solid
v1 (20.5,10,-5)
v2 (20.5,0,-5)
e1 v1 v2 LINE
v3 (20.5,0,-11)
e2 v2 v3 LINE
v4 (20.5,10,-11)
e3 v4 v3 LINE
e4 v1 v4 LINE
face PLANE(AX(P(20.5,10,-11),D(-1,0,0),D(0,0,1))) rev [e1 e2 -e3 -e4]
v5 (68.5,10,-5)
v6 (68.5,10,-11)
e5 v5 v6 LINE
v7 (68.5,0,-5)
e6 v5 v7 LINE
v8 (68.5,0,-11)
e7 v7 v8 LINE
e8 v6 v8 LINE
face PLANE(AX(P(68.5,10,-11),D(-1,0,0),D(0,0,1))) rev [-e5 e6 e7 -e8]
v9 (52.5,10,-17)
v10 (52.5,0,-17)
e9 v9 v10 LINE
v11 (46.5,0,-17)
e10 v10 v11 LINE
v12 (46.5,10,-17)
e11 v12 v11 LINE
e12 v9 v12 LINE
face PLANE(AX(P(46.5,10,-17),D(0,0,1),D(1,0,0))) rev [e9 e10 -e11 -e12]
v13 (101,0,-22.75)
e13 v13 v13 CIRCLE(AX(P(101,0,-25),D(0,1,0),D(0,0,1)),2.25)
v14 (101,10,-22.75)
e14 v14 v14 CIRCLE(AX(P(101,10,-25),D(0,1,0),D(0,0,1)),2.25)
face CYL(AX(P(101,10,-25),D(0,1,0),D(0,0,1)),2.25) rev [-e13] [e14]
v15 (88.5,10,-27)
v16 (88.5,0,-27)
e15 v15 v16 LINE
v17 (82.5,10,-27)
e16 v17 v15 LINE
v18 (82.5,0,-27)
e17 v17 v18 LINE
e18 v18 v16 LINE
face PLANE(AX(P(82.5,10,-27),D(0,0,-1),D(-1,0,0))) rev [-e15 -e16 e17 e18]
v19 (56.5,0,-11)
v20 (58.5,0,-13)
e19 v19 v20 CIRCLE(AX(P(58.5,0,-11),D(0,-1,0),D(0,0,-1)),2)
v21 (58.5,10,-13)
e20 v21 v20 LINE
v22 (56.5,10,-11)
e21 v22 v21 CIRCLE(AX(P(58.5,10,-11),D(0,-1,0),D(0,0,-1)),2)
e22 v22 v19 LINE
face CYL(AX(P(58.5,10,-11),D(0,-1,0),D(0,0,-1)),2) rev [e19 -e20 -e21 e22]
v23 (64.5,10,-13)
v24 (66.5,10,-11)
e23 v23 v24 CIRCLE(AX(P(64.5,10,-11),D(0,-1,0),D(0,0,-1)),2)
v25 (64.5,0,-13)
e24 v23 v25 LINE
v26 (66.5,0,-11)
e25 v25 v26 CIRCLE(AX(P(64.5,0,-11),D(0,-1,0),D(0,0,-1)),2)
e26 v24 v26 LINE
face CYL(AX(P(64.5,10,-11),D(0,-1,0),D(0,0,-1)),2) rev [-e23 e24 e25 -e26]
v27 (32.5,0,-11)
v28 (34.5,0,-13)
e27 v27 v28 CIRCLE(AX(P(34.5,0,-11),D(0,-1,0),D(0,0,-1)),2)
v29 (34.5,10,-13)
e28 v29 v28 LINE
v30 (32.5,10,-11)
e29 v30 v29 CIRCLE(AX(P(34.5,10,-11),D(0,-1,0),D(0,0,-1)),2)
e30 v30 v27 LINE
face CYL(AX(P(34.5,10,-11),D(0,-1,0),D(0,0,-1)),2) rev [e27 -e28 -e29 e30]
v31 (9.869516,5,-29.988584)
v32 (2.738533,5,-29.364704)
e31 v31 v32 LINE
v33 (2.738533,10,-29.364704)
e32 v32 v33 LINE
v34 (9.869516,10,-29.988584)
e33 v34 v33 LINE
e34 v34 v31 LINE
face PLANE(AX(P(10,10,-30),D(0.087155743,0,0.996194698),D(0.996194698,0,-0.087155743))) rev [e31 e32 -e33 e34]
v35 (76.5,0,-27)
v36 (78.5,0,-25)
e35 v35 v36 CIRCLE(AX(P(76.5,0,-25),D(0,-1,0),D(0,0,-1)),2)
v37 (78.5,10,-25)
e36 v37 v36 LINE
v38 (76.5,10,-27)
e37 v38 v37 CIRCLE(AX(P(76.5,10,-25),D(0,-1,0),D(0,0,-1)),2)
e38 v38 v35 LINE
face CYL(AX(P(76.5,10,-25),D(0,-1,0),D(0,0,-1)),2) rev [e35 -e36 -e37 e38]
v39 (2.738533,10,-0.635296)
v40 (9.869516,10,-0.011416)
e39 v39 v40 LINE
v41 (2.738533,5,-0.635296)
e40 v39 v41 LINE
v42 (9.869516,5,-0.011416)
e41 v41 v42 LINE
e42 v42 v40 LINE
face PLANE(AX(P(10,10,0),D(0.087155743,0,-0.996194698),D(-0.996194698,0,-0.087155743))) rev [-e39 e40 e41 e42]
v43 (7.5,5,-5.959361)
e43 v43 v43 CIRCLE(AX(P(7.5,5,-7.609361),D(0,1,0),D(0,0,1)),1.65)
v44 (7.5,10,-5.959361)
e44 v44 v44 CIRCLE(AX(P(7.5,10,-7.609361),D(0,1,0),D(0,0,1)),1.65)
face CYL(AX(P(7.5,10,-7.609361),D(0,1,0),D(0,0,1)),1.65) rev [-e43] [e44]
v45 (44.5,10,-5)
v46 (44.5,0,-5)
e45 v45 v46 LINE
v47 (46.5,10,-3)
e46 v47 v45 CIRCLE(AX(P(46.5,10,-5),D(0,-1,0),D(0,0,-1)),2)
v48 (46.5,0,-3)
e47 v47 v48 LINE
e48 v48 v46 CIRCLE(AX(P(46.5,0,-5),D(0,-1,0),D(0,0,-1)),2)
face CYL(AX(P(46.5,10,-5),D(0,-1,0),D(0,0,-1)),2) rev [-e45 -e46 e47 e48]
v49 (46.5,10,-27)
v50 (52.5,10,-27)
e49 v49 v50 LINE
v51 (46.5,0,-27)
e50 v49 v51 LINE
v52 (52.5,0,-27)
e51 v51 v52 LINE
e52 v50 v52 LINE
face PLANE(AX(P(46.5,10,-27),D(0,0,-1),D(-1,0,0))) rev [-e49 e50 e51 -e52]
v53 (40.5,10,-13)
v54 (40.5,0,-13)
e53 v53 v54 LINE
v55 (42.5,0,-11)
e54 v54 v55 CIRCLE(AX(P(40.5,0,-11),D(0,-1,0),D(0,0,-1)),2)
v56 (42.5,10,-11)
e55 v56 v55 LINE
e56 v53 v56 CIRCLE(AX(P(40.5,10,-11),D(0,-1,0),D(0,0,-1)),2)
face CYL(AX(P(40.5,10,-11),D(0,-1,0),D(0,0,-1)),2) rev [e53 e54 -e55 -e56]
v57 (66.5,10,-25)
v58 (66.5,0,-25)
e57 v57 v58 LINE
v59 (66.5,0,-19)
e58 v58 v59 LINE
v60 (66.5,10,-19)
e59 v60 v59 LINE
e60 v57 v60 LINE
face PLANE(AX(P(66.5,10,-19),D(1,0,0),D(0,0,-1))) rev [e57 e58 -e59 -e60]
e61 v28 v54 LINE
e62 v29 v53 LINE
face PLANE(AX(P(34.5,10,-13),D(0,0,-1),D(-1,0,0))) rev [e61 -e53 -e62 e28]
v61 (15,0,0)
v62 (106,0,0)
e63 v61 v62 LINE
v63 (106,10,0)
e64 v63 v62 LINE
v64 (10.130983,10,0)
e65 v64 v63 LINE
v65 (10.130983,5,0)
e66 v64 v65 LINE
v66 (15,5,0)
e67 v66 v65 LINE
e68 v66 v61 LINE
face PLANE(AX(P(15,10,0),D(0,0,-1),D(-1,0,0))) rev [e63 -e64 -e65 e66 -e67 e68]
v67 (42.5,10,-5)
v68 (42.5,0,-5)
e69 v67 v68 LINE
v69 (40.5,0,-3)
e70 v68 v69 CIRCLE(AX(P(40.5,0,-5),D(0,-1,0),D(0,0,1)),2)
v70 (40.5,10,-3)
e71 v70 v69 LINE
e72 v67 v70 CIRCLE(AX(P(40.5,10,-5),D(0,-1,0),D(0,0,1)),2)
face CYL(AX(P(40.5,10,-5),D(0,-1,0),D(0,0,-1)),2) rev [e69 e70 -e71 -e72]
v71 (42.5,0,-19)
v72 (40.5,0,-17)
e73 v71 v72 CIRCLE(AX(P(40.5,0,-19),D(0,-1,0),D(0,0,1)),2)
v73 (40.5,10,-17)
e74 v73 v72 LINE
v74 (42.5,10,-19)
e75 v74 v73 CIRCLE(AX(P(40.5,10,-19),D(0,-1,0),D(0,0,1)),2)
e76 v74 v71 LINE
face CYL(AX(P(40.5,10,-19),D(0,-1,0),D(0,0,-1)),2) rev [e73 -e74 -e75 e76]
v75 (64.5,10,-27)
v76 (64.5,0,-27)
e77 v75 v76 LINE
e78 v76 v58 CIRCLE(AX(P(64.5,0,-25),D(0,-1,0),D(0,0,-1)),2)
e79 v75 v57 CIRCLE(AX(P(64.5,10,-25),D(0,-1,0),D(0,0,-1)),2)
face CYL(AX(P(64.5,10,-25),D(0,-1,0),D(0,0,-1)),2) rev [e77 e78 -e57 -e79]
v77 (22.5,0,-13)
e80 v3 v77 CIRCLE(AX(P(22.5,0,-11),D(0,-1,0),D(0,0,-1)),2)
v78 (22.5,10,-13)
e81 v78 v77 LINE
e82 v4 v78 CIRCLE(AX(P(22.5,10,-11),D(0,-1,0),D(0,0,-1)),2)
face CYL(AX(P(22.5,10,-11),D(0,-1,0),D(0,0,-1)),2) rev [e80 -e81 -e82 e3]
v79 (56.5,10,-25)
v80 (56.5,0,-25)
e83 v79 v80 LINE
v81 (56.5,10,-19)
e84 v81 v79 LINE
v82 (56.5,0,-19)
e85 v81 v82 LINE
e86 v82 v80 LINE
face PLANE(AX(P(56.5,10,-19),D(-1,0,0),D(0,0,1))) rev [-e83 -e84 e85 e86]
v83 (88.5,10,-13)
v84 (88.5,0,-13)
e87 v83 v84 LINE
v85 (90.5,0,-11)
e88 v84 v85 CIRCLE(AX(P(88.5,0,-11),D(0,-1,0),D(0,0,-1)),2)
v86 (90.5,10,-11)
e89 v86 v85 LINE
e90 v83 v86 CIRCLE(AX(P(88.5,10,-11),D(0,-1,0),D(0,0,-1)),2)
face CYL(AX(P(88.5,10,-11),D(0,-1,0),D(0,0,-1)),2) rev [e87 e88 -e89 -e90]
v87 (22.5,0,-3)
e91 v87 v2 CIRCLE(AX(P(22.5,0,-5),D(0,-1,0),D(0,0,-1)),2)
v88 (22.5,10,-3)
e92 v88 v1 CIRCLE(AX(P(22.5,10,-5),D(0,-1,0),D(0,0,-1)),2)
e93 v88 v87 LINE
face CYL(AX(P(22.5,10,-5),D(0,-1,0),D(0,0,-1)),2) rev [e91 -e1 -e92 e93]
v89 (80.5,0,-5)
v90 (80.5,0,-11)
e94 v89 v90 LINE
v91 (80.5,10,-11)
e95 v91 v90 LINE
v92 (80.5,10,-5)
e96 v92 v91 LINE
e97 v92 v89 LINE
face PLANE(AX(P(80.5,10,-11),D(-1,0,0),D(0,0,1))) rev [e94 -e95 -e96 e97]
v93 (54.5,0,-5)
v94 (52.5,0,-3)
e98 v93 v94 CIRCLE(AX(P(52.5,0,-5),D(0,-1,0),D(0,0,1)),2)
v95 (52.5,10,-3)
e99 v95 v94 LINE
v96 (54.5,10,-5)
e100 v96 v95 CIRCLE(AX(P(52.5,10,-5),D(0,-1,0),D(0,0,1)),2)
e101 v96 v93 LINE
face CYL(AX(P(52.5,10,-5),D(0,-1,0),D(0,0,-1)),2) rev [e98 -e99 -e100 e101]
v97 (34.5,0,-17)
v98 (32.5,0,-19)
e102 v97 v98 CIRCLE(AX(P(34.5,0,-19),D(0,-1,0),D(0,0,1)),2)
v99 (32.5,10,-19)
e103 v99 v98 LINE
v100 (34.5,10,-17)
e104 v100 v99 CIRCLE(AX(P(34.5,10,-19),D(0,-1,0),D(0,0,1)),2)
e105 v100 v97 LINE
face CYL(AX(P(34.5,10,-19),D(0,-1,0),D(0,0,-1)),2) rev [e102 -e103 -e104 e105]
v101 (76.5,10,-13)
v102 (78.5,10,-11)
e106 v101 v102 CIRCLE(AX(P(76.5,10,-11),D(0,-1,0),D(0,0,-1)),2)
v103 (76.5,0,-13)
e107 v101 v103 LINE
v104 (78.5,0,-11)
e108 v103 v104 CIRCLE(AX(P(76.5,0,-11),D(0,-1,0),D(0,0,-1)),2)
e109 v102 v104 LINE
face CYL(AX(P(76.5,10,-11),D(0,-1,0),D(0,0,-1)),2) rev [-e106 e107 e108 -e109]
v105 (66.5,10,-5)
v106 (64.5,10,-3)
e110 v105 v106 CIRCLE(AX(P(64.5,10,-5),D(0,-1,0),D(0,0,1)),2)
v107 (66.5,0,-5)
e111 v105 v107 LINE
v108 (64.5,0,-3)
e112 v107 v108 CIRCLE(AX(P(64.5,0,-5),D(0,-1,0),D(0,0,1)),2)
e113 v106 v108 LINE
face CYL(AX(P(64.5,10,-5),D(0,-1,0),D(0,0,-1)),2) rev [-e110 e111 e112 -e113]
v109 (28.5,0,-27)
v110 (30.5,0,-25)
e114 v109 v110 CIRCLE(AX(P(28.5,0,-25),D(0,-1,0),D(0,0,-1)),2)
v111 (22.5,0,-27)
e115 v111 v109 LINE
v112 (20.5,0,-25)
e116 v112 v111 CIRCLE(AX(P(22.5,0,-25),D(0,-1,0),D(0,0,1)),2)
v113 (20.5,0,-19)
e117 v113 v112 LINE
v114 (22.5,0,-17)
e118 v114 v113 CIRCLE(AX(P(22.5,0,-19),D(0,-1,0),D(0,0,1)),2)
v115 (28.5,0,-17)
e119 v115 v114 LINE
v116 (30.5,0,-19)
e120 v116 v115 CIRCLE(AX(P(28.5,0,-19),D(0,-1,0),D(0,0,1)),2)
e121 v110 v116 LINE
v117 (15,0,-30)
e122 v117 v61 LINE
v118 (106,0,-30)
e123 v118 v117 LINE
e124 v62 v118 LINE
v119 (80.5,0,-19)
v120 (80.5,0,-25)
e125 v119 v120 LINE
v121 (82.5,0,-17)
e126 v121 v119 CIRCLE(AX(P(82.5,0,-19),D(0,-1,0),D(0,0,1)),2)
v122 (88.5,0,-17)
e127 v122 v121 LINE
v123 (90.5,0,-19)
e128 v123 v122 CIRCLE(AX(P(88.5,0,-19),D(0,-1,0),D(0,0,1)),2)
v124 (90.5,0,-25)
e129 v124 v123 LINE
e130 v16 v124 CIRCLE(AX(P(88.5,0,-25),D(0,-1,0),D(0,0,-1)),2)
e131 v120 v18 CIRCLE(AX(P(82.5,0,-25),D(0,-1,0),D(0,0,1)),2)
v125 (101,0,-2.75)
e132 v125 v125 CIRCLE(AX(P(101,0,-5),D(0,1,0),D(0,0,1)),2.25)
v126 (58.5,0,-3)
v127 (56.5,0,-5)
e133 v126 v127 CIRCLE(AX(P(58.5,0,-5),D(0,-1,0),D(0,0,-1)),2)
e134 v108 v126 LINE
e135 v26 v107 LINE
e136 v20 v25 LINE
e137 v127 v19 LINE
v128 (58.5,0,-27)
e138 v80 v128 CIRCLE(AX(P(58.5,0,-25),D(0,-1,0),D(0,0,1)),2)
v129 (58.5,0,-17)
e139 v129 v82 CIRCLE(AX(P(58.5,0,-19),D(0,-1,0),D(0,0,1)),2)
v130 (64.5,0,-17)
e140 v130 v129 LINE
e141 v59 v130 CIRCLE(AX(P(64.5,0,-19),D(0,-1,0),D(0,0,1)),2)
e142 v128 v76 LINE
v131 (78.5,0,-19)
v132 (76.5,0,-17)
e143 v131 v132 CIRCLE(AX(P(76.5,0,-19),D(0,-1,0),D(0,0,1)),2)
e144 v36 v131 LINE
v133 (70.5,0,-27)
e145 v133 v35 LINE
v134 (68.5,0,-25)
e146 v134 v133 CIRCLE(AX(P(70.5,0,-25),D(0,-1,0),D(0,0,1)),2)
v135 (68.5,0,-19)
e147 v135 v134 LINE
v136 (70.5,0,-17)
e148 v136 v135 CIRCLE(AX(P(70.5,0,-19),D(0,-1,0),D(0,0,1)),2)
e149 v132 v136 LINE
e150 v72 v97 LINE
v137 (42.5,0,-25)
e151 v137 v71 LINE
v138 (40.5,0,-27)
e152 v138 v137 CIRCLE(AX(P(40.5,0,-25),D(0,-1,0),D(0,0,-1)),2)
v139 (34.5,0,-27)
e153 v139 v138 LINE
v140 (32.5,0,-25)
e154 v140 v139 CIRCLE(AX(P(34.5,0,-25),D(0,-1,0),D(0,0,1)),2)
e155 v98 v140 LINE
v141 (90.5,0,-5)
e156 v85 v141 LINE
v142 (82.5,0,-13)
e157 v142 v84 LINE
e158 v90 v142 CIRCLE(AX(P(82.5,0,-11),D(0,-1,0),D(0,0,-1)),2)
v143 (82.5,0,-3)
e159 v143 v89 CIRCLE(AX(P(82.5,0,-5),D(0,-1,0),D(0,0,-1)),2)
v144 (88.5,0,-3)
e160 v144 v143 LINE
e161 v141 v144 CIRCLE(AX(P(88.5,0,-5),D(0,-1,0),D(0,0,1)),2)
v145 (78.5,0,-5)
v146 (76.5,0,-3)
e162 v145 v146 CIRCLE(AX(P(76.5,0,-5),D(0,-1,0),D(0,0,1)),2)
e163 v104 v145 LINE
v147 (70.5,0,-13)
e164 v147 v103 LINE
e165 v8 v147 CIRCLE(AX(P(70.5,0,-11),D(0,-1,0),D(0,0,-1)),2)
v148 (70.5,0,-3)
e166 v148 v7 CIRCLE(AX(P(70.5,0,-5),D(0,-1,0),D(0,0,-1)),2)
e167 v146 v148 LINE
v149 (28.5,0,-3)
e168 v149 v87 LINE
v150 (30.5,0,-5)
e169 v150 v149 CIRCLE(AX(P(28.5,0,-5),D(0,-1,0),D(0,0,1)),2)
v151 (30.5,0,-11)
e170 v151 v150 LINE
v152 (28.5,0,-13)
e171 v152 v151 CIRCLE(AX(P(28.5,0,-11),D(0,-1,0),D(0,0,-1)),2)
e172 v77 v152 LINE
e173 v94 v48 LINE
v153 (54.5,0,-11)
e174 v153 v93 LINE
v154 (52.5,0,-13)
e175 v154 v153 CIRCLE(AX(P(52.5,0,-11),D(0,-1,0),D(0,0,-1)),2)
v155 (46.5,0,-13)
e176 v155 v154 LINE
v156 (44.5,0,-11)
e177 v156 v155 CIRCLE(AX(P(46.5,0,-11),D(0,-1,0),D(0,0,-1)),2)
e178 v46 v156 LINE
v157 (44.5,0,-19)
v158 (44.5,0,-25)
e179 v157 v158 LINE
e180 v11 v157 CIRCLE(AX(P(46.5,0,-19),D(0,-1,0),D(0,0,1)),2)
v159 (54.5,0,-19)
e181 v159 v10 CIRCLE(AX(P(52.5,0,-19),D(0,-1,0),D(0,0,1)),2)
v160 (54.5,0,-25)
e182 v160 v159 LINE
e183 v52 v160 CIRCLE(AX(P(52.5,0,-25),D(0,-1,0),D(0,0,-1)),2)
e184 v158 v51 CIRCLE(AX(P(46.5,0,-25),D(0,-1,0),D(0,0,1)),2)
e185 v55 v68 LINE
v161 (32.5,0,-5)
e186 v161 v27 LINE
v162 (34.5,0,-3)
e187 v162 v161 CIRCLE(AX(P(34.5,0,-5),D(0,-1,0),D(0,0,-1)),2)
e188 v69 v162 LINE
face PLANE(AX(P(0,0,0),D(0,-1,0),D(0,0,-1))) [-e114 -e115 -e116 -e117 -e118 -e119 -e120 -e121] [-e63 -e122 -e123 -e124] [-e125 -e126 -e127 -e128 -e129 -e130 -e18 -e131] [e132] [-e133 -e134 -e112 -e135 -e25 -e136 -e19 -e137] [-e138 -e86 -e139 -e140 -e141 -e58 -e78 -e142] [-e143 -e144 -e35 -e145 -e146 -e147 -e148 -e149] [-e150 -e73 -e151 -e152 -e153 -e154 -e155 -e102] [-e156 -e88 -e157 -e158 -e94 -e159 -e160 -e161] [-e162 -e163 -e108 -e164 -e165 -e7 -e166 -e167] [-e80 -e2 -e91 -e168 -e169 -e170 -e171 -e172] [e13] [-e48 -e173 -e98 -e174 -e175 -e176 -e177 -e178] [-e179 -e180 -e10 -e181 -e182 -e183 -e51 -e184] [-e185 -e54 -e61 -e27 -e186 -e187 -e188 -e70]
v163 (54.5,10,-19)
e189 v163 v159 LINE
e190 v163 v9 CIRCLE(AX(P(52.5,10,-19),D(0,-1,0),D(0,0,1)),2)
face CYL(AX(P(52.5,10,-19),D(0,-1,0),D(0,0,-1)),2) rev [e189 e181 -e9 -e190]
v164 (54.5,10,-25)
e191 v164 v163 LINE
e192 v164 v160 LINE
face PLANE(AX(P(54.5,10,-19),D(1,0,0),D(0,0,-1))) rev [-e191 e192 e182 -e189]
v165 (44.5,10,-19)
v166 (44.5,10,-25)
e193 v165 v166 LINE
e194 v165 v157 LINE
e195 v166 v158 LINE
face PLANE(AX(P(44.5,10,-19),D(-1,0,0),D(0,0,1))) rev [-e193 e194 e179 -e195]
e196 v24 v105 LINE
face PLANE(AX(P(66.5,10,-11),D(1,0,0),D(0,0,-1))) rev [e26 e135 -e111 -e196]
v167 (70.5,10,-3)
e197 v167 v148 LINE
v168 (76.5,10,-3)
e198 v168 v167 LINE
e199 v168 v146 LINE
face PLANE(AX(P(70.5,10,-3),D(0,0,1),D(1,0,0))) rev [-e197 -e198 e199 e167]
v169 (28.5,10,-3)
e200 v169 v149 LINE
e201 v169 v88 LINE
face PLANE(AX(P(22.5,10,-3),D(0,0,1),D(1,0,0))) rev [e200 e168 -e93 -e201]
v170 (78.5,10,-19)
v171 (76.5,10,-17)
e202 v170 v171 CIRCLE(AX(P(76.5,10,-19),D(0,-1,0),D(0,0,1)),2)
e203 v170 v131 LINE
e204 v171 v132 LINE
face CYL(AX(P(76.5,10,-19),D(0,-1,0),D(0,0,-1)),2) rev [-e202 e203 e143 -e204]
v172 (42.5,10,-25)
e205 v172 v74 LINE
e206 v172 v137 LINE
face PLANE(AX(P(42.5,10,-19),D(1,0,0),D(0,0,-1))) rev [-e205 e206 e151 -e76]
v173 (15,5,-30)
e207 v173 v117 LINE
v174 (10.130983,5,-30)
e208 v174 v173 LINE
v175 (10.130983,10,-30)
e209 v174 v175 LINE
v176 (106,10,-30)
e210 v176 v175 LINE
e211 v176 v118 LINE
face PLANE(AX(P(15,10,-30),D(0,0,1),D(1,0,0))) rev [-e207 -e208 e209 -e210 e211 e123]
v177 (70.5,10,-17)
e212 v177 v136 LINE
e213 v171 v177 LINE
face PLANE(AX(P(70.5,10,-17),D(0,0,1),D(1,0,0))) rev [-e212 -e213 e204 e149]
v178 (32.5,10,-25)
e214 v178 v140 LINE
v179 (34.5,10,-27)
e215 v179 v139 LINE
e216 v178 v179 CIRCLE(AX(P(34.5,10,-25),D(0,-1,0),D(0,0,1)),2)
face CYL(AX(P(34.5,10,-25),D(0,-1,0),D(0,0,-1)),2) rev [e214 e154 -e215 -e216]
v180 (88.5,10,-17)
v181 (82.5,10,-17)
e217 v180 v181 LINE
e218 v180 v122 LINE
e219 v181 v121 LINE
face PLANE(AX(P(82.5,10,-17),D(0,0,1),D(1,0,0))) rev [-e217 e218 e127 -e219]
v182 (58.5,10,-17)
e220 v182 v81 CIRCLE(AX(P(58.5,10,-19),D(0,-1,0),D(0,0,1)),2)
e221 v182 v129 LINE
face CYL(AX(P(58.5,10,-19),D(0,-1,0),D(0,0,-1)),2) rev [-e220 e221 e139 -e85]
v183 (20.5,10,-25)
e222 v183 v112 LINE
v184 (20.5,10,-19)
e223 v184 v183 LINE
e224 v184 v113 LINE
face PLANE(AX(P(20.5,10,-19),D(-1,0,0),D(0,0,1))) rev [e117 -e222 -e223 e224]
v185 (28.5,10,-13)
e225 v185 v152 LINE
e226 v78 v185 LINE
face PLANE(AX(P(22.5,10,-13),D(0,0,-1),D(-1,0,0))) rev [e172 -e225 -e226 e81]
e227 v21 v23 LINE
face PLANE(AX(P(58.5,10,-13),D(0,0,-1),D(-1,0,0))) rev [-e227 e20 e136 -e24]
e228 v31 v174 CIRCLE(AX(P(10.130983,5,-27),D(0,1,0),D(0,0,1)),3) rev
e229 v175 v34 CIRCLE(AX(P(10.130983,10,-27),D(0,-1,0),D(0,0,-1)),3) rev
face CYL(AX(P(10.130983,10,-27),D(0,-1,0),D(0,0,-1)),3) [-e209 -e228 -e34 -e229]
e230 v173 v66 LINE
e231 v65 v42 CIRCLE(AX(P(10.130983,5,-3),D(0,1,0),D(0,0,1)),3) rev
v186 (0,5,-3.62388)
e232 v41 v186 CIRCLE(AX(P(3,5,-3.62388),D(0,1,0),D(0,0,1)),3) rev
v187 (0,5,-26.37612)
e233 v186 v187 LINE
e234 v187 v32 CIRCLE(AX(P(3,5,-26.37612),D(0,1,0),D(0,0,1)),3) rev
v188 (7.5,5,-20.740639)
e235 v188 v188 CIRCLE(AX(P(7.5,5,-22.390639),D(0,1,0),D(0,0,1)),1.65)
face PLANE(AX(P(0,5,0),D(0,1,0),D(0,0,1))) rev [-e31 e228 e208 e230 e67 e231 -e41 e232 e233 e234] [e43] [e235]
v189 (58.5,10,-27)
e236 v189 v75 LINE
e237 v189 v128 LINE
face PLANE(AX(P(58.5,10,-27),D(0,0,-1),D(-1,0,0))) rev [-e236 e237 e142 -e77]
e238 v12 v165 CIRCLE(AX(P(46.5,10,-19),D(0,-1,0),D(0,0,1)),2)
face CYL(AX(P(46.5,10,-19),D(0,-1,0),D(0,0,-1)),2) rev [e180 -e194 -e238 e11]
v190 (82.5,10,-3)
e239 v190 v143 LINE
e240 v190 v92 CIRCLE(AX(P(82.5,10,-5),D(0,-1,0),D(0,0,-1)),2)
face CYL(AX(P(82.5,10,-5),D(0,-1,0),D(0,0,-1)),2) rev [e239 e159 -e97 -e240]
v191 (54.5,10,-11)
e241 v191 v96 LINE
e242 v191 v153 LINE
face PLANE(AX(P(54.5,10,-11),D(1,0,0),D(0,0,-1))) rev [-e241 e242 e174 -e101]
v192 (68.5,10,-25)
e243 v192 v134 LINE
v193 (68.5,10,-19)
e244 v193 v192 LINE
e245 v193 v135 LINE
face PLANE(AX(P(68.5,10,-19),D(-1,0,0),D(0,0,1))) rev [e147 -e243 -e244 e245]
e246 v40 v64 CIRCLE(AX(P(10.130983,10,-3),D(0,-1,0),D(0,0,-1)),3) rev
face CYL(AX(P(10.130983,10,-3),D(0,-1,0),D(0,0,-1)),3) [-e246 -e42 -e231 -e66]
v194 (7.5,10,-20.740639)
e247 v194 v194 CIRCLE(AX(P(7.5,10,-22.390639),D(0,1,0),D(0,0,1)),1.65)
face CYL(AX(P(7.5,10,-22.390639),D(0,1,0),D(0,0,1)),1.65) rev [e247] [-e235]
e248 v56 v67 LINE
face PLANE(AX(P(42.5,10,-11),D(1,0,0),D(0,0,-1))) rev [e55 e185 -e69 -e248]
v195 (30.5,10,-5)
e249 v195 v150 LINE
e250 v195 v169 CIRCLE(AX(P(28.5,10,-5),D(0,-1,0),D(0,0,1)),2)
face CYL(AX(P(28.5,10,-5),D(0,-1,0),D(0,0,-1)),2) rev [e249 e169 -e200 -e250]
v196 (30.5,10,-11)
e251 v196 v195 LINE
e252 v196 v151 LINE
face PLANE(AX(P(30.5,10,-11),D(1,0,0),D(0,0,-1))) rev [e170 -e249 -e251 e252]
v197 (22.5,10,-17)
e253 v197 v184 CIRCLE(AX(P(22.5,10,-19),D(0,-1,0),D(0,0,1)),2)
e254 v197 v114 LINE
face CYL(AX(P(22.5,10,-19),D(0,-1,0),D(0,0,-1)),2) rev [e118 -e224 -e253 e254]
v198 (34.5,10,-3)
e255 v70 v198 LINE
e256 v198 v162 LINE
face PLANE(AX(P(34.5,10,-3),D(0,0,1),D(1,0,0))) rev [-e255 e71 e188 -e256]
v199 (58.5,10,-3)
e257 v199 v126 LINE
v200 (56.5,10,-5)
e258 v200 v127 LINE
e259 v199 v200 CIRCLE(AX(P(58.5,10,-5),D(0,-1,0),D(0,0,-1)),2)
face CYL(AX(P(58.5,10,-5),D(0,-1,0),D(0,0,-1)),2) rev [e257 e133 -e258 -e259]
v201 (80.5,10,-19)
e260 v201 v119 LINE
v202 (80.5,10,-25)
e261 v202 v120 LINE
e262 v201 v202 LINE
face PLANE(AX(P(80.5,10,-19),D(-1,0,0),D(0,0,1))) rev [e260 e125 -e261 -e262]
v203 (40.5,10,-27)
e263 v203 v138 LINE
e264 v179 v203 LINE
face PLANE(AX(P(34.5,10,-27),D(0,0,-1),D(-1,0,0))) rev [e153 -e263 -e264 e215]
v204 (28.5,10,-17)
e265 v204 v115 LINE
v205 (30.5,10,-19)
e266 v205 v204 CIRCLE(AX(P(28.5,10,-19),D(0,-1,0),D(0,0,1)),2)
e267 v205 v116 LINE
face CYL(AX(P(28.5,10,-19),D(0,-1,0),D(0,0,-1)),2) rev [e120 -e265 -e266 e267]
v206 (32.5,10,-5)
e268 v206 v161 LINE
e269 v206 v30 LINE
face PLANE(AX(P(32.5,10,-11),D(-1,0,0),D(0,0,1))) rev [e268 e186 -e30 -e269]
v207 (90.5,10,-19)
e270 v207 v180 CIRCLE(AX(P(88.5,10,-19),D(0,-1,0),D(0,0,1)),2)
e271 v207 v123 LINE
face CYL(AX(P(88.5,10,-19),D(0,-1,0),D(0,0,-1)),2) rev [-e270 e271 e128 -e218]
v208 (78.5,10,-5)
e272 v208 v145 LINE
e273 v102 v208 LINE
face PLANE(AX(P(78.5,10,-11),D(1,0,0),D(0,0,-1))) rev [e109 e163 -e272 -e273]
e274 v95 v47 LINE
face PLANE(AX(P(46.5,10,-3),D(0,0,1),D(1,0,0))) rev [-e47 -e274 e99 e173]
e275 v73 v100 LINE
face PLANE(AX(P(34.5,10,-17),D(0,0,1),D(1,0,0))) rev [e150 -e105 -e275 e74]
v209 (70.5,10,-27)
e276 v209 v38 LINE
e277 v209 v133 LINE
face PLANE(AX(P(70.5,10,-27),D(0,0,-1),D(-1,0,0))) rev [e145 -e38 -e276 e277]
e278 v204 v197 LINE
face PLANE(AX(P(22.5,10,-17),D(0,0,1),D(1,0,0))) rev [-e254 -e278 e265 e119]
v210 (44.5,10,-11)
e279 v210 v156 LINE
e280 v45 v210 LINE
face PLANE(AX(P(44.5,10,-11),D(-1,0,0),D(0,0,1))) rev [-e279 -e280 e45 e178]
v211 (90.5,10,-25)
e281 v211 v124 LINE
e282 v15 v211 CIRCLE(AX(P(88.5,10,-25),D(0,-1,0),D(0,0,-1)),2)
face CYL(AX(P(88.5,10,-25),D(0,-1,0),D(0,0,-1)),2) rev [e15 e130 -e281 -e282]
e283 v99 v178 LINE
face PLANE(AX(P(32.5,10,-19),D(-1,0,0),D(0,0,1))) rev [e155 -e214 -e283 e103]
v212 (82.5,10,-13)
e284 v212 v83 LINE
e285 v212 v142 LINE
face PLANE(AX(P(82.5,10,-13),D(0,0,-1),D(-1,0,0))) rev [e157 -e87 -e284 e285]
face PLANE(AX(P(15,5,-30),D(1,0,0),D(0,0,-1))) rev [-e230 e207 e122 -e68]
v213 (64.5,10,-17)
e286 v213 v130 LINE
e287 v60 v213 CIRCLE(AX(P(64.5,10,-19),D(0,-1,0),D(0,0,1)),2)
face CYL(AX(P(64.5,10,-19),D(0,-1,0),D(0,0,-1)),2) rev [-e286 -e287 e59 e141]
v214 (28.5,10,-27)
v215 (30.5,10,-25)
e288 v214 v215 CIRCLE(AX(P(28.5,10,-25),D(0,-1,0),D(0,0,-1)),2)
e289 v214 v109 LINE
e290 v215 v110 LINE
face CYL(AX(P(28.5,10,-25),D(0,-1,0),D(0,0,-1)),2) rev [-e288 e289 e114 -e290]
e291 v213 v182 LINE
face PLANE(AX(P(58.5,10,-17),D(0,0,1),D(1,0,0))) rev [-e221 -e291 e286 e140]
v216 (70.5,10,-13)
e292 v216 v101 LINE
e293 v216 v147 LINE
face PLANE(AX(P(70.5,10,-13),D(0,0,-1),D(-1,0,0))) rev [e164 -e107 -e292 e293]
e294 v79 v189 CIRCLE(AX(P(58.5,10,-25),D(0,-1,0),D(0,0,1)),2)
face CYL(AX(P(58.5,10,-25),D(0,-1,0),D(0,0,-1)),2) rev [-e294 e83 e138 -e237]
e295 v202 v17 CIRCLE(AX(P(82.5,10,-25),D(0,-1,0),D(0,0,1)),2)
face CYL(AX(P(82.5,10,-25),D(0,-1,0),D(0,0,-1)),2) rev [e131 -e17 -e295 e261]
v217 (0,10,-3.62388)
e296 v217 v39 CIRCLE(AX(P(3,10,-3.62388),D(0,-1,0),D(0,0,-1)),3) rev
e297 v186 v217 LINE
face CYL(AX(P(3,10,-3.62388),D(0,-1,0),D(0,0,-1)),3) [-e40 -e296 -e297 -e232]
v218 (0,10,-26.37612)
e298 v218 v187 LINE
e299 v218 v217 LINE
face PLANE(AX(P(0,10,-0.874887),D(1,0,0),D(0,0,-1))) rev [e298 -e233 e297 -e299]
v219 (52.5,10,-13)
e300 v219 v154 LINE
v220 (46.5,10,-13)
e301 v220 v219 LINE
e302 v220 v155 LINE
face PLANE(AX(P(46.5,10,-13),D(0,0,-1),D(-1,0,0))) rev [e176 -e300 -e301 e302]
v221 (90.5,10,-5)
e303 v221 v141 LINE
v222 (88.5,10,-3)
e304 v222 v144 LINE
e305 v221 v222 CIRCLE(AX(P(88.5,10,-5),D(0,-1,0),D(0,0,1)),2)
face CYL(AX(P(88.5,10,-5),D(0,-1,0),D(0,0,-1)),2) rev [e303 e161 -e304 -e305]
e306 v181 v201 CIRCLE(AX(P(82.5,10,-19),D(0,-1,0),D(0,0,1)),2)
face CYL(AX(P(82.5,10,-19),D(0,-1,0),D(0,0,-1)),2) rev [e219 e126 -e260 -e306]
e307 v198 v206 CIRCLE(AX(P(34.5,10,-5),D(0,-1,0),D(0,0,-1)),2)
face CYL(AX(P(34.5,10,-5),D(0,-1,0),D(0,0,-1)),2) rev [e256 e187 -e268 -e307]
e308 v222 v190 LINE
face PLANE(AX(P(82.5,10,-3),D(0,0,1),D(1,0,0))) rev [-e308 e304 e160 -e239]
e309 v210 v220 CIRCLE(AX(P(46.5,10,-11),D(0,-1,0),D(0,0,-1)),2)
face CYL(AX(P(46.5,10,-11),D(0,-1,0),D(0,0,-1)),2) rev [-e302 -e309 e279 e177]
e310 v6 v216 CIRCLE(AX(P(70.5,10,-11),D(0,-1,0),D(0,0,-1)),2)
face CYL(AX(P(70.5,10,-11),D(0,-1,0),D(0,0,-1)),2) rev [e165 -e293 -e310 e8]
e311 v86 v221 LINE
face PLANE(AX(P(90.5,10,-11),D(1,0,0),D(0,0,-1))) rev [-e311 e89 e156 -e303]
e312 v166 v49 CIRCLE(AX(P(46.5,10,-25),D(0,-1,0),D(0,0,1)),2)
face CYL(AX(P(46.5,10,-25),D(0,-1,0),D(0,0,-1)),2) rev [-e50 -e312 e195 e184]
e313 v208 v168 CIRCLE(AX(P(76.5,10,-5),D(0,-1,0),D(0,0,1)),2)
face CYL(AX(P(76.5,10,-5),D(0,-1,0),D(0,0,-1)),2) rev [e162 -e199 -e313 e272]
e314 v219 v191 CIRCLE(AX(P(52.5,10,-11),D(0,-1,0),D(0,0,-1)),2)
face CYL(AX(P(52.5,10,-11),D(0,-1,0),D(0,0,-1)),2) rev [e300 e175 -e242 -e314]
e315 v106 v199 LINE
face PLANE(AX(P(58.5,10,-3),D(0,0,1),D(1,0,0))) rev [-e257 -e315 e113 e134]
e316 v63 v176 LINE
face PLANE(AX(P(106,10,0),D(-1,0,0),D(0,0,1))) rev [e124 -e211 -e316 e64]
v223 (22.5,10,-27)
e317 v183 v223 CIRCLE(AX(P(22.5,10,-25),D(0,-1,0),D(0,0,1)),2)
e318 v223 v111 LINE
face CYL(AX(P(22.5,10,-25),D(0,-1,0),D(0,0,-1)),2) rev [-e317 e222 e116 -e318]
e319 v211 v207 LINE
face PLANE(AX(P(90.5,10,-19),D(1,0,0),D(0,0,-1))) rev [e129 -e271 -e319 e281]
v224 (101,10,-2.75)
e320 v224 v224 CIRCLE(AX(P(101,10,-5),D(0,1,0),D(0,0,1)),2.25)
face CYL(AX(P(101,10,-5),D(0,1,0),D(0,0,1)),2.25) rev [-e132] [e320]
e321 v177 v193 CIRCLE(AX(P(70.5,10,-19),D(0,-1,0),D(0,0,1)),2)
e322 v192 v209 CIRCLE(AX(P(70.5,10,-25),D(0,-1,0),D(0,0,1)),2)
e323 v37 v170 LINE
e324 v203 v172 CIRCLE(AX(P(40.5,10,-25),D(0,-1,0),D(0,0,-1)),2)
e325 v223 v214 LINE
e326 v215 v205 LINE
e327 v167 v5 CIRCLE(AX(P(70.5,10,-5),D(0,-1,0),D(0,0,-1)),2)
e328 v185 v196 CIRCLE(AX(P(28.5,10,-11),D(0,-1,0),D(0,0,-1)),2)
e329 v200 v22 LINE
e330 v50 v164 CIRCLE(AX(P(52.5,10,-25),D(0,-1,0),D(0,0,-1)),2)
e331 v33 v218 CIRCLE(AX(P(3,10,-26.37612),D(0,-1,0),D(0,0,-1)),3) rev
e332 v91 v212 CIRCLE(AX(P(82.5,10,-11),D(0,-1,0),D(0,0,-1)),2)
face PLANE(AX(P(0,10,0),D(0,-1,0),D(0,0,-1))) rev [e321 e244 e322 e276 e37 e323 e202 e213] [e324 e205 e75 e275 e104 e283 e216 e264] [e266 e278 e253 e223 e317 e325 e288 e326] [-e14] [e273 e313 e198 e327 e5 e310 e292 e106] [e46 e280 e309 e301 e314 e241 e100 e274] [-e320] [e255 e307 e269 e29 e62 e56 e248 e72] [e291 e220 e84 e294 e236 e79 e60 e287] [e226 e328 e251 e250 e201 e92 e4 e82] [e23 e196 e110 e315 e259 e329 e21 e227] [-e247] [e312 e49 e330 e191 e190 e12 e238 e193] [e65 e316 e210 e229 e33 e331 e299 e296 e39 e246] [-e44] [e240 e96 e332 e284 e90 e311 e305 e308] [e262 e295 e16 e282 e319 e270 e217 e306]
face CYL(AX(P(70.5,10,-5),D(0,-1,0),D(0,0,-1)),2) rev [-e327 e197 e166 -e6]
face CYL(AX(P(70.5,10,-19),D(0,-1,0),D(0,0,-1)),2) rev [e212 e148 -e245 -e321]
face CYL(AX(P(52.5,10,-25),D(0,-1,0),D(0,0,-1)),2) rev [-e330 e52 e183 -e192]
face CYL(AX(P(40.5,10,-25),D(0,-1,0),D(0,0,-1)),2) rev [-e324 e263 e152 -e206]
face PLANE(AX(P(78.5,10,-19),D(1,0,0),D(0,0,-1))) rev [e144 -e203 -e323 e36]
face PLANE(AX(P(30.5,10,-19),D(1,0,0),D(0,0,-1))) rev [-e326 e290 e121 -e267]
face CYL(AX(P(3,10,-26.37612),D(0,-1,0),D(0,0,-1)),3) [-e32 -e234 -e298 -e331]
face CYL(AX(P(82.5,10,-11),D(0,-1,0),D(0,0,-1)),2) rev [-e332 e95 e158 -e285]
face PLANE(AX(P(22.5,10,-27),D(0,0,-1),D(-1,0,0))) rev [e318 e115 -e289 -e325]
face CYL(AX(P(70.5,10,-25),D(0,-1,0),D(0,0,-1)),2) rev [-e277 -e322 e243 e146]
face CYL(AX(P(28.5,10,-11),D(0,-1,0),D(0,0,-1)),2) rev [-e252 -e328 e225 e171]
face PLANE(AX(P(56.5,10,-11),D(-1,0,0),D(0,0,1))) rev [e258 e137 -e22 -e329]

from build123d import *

# Parameters (mm, degrees)
EXTRUDE_1_DEPTH     = 10
SKETCH_4_W          = 15
SKETCH_4_H          = 30
CUT_EXTRUDE_2_DEPTH = 5
FILLET_1_R          = 3
CUT_EXTRUDE_3_DEPTH = 111.616454472
HOLE_WIZARD_M41_D   = 4.5
M4X0_72_D           = 3.3


with BuildPart() as part:
    # Эскиз1 → Бобышка-Вытянуть1 (new body)
    with BuildSketch(Plane(origin=(0, 0, 0), x_dir=(1, 0, 0), z_dir=(0, 1, 0))):
        Polygon((15, 0), (106, 0), (106, 30), (15, 30), (10, 30), (0, 29.125113365), (0, 0.874886635), (10, 0), align=None)
    extrude(amount=EXTRUDE_1_DEPTH)

    # Эскиз4 → Вырез-Вытянуть2 (cut)
    with BuildSketch(Plane.XZ):
        with Locations((7.5, -15)):
            Rectangle(SKETCH_4_W, SKETCH_4_H)
    extrude(amount=-CUT_EXTRUDE_2_DEPTH, mode=Mode.SUBTRACT)

    # Скругление1
    # the kernel refuses this fillet: 3 mm, written as the material it takes off along each edge
    with BuildSketch(Plane(origin=(10, 4.672542928, 0), x_dir=(1, 0, 0), z_dir=(0, 1, 0))) as fillet_1_piece_1:
        with BuildLine():
            CenterArc((FILLET_1_R * 0.0436609429085, FILLET_1_R), FILLET_1_R, 265, 5)
            Line((-FILLET_1_R * 0.0434947998391, FILLET_1_R * 0.00380530190825), (0, 0))
            Line((0, 0), (FILLET_1_R * 0.0436609429085, 0))
        make_face()
    extrude(amount=5.654914144, mode=Mode.SUBTRACT)
    with BuildSketch(Plane(origin=(0, -1.872483805, -0.874886635), x_dir=(0.9961946980917452, 0, 0.08715574274766158), z_dir=(0, 1, 0))) as fillet_1_piece_2:
        with BuildLine():
            CenterArc((FILLET_1_R * 0.916331174017, FILLET_1_R), FILLET_1_R, 185, 85)
            Line((-FILLET_1_R * 0.0798635240743, FILLET_1_R * 0.912844257252), (0, 0))
            Line((0, 0), (FILLET_1_R * 0.916331174017, 0))
        make_face()
    extrude(amount=18.74496761, mode=Mode.SUBTRACT)
    with BuildSketch(Plane(origin=(0, -1.872483805, -29.125113365), x_dir=(0.9961946980917452, 0, -0.08715574274766201), z_dir=(0, 1, 0))) as fillet_1_piece_3:
        with BuildLine():
            CenterArc((FILLET_1_R * 0.916331174017, -FILLET_1_R), FILLET_1_R, 90, 85)
            Line((-FILLET_1_R * 0.0798635240743, -FILLET_1_R * 0.912844257252), (0, 0))
            Line((0, 0), (FILLET_1_R * 0.916331174017, 0))
        make_face()
    extrude(amount=18.74496761, mode=Mode.SUBTRACT)
    with BuildSketch(Plane(origin=(10, 4.672542928, -30), x_dir=(1, 0, 0), z_dir=(0, 1, 0))) as fillet_1_piece_4:
        with BuildLine():
            CenterArc((FILLET_1_R * 0.0436609429085, -FILLET_1_R), FILLET_1_R, 90, 5)
            Line((-FILLET_1_R * 0.0434947998391, -FILLET_1_R * 0.00380530190825), (0, 0))
            Line((0, 0), (FILLET_1_R * 0.0436609429085, 0))
        make_face()
    extrude(amount=5.654914144, mode=Mode.SUBTRACT)

    # Эскиз5 → Вырез-Вытянуть3 (cut, through all)
    with BuildSketch(Plane.XZ):
        with BuildLine():
            Line((22.5, -17), (28.5, -17))
            ThreePointArc((28.5, -17), (29.914213562, -17.585786438), (30.5, -19))
            Line((30.5, -19), (30.5, -25))
            ThreePointArc((30.5, -25), (29.914213562, -26.414213562), (28.5, -27))
            Line((28.5, -27), (22.5, -27))
            ThreePointArc((22.5, -27), (21.085786438, -26.414213562), (20.5, -25))
            Line((20.5, -25), (20.5, -19))
            ThreePointArc((20.5, -19), (21.085786438, -17.585786438), (22.5, -17))
        make_face()
        with BuildLine():
            Line((34.5, -17), (40.5, -17))
            ThreePointArc((40.5, -17), (41.914213562, -17.585786438), (42.5, -19))
            Line((42.5, -19), (42.5, -25))
            ThreePointArc((42.5, -25), (41.914213562, -26.414213562), (40.5, -27))
            Line((40.5, -27), (34.5, -27))
            ThreePointArc((34.5, -27), (33.085786438, -26.414213562), (32.5, -25))
            Line((32.5, -25), (32.5, -19))
            ThreePointArc((32.5, -19), (33.085786438, -17.585786438), (34.5, -17))
        make_face()
        with BuildLine():
            Line((46.5, -17), (52.5, -17))
            ThreePointArc((52.5, -17), (53.914213562, -17.585786438), (54.5, -19))
            Line((54.5, -19), (54.5, -25))
            ThreePointArc((54.5, -25), (53.914213562, -26.414213562), (52.5, -27))
            Line((52.5, -27), (46.5, -27))
            ThreePointArc((46.5, -27), (45.085786438, -26.414213562), (44.5, -25))
            Line((44.5, -25), (44.5, -19))
            ThreePointArc((44.5, -19), (45.085786438, -17.585786438), (46.5, -17))
        make_face()
        with BuildLine():
            Line((58.5, -17), (64.5, -17))
            ThreePointArc((64.5, -17), (65.914213562, -17.585786438), (66.5, -19))
            Line((66.5, -19), (66.5, -25))
            ThreePointArc((66.5, -25), (65.914213562, -26.414213562), (64.5, -27))
            Line((64.5, -27), (58.5, -27))
            ThreePointArc((58.5, -27), (57.085786438, -26.414213562), (56.5, -25))
            Line((56.5, -25), (56.5, -19))
            ThreePointArc((56.5, -19), (57.085786438, -17.585786438), (58.5, -17))
        make_face()
        with BuildLine():
            Line((70.5, -17), (76.5, -17))
            ThreePointArc((76.5, -17), (77.914213562, -17.585786438), (78.5, -19))
            Line((78.5, -19), (78.5, -25))
            ThreePointArc((78.5, -25), (77.914213562, -26.414213562), (76.5, -27))
            Line((76.5, -27), (70.5, -27))
            ThreePointArc((70.5, -27), (69.085786438, -26.414213562), (68.5, -25))
            Line((68.5, -25), (68.5, -19))
            ThreePointArc((68.5, -19), (69.085786438, -17.585786438), (70.5, -17))
        make_face()
        with BuildLine():
            Line((82.5, -17), (88.5, -17))
            ThreePointArc((88.5, -17), (89.914213562, -17.585786438), (90.5, -19))
            Line((90.5, -19), (90.5, -25))
            ThreePointArc((90.5, -25), (89.914213562, -26.414213562), (88.5, -27))
            Line((88.5, -27), (82.5, -27))
            ThreePointArc((82.5, -27), (81.085786438, -26.414213562), (80.5, -25))
            Line((80.5, -25), (80.5, -19))
            ThreePointArc((80.5, -19), (81.085786438, -17.585786438), (82.5, -17))
        make_face()
        with BuildLine():
            Line((90.5, -11), (90.5, -5))
            ThreePointArc((90.5, -5), (89.914213562, -3.585786438), (88.5, -3))
            Line((88.5, -3), (82.5, -3))
            ThreePointArc((82.5, -3), (81.085786438, -3.585786438), (80.5, -5))
            Line((80.5, -5), (80.5, -11))
            ThreePointArc((80.5, -11), (81.085786438, -12.414213562), (82.5, -13))
            Line((82.5, -13), (88.5, -13))
            ThreePointArc((88.5, -13), (89.914213562, -12.414213562), (90.5, -11))
        make_face()
        with BuildLine():
            Line((78.5, -11), (78.5, -5))
            ThreePointArc((78.5, -5), (77.914213562, -3.585786438), (76.5, -3))
            Line((76.5, -3), (70.5, -3))
            ThreePointArc((70.5, -3), (69.085786438, -3.585786438), (68.5, -5))
            Line((68.5, -5), (68.5, -11))
            ThreePointArc((68.5, -11), (69.085786438, -12.414213562), (70.5, -13))
            Line((70.5, -13), (76.5, -13))
            ThreePointArc((76.5, -13), (77.914213562, -12.414213562), (78.5, -11))
        make_face()
        with BuildLine():
            Line((66.5, -11), (66.5, -5))
            ThreePointArc((66.5, -5), (65.914213562, -3.585786438), (64.5, -3))
            Line((64.5, -3), (58.5, -3))
            ThreePointArc((58.5, -3), (57.085786438, -3.585786438), (56.5, -5))
            Line((56.5, -5), (56.5, -11))
            ThreePointArc((56.5, -11), (57.085786438, -12.414213562), (58.5, -13))
            Line((58.5, -13), (64.5, -13))
            ThreePointArc((64.5, -13), (65.914213562, -12.414213562), (66.5, -11))
        make_face()
        with BuildLine():
            Line((54.5, -11), (54.5, -5))
            ThreePointArc((54.5, -5), (53.914213562, -3.585786438), (52.5, -3))
            Line((52.5, -3), (46.5, -3))
            ThreePointArc((46.5, -3), (45.085786438, -3.585786438), (44.5, -5))
            Line((44.5, -5), (44.5, -11))
            ThreePointArc((44.5, -11), (45.085786438, -12.414213562), (46.5, -13))
            Line((46.5, -13), (52.5, -13))
            ThreePointArc((52.5, -13), (53.914213562, -12.414213562), (54.5, -11))
        make_face()
        with BuildLine():
            Line((42.5, -11), (42.5, -5))
            ThreePointArc((42.5, -5), (41.914213562, -3.585786438), (40.5, -3))
            Line((40.5, -3), (34.5, -3))
            ThreePointArc((34.5, -3), (33.085786438, -3.585786438), (32.5, -5))
            Line((32.5, -5), (32.5, -11))
            ThreePointArc((32.5, -11), (33.085786438, -12.414213562), (34.5, -13))
            Line((34.5, -13), (40.5, -13))
            ThreePointArc((40.5, -13), (41.914213562, -12.414213562), (42.5, -11))
        make_face()
        with BuildLine():
            Line((30.5, -11), (30.5, -5))
            ThreePointArc((30.5, -5), (29.914213562, -3.585786438), (28.5, -3))
            Line((28.5, -3), (22.5, -3))
            ThreePointArc((22.5, -3), (21.085786438, -3.585786438), (20.5, -5))
            Line((20.5, -5), (20.5, -11))
            ThreePointArc((20.5, -11), (21.085786438, -12.414213562), (22.5, -13))
            Line((22.5, -13), (28.5, -13))
            ThreePointArc((28.5, -13), (29.914213562, -12.414213562), (30.5, -11))
        make_face()
    extrude(amount=-CUT_EXTRUDE_3_DEPTH, mode=Mode.SUBTRACT)

    # Отверстие с зазором M41 (through all)
    with Locations(Plane(origin=(0, 10, 0), x_dir=(1, 0, 0), z_dir=(0, 1, 0))):
        with Locations((101, 25), (101, 5)):
            Hole(HOLE_WIZARD_M41_D / 2)

    # Отверстие обработанное метчиком M4x0.72 (through all)
    with Locations(Plane(origin=(0, 10, 0), x_dir=(1, 0, 0), z_dir=(0, 1, 0))):
        with Locations((7.5, 22.390639171), (7.5, 7.609360829)):
            Hole(M4X0_72_D / 2)


solid = part.part
